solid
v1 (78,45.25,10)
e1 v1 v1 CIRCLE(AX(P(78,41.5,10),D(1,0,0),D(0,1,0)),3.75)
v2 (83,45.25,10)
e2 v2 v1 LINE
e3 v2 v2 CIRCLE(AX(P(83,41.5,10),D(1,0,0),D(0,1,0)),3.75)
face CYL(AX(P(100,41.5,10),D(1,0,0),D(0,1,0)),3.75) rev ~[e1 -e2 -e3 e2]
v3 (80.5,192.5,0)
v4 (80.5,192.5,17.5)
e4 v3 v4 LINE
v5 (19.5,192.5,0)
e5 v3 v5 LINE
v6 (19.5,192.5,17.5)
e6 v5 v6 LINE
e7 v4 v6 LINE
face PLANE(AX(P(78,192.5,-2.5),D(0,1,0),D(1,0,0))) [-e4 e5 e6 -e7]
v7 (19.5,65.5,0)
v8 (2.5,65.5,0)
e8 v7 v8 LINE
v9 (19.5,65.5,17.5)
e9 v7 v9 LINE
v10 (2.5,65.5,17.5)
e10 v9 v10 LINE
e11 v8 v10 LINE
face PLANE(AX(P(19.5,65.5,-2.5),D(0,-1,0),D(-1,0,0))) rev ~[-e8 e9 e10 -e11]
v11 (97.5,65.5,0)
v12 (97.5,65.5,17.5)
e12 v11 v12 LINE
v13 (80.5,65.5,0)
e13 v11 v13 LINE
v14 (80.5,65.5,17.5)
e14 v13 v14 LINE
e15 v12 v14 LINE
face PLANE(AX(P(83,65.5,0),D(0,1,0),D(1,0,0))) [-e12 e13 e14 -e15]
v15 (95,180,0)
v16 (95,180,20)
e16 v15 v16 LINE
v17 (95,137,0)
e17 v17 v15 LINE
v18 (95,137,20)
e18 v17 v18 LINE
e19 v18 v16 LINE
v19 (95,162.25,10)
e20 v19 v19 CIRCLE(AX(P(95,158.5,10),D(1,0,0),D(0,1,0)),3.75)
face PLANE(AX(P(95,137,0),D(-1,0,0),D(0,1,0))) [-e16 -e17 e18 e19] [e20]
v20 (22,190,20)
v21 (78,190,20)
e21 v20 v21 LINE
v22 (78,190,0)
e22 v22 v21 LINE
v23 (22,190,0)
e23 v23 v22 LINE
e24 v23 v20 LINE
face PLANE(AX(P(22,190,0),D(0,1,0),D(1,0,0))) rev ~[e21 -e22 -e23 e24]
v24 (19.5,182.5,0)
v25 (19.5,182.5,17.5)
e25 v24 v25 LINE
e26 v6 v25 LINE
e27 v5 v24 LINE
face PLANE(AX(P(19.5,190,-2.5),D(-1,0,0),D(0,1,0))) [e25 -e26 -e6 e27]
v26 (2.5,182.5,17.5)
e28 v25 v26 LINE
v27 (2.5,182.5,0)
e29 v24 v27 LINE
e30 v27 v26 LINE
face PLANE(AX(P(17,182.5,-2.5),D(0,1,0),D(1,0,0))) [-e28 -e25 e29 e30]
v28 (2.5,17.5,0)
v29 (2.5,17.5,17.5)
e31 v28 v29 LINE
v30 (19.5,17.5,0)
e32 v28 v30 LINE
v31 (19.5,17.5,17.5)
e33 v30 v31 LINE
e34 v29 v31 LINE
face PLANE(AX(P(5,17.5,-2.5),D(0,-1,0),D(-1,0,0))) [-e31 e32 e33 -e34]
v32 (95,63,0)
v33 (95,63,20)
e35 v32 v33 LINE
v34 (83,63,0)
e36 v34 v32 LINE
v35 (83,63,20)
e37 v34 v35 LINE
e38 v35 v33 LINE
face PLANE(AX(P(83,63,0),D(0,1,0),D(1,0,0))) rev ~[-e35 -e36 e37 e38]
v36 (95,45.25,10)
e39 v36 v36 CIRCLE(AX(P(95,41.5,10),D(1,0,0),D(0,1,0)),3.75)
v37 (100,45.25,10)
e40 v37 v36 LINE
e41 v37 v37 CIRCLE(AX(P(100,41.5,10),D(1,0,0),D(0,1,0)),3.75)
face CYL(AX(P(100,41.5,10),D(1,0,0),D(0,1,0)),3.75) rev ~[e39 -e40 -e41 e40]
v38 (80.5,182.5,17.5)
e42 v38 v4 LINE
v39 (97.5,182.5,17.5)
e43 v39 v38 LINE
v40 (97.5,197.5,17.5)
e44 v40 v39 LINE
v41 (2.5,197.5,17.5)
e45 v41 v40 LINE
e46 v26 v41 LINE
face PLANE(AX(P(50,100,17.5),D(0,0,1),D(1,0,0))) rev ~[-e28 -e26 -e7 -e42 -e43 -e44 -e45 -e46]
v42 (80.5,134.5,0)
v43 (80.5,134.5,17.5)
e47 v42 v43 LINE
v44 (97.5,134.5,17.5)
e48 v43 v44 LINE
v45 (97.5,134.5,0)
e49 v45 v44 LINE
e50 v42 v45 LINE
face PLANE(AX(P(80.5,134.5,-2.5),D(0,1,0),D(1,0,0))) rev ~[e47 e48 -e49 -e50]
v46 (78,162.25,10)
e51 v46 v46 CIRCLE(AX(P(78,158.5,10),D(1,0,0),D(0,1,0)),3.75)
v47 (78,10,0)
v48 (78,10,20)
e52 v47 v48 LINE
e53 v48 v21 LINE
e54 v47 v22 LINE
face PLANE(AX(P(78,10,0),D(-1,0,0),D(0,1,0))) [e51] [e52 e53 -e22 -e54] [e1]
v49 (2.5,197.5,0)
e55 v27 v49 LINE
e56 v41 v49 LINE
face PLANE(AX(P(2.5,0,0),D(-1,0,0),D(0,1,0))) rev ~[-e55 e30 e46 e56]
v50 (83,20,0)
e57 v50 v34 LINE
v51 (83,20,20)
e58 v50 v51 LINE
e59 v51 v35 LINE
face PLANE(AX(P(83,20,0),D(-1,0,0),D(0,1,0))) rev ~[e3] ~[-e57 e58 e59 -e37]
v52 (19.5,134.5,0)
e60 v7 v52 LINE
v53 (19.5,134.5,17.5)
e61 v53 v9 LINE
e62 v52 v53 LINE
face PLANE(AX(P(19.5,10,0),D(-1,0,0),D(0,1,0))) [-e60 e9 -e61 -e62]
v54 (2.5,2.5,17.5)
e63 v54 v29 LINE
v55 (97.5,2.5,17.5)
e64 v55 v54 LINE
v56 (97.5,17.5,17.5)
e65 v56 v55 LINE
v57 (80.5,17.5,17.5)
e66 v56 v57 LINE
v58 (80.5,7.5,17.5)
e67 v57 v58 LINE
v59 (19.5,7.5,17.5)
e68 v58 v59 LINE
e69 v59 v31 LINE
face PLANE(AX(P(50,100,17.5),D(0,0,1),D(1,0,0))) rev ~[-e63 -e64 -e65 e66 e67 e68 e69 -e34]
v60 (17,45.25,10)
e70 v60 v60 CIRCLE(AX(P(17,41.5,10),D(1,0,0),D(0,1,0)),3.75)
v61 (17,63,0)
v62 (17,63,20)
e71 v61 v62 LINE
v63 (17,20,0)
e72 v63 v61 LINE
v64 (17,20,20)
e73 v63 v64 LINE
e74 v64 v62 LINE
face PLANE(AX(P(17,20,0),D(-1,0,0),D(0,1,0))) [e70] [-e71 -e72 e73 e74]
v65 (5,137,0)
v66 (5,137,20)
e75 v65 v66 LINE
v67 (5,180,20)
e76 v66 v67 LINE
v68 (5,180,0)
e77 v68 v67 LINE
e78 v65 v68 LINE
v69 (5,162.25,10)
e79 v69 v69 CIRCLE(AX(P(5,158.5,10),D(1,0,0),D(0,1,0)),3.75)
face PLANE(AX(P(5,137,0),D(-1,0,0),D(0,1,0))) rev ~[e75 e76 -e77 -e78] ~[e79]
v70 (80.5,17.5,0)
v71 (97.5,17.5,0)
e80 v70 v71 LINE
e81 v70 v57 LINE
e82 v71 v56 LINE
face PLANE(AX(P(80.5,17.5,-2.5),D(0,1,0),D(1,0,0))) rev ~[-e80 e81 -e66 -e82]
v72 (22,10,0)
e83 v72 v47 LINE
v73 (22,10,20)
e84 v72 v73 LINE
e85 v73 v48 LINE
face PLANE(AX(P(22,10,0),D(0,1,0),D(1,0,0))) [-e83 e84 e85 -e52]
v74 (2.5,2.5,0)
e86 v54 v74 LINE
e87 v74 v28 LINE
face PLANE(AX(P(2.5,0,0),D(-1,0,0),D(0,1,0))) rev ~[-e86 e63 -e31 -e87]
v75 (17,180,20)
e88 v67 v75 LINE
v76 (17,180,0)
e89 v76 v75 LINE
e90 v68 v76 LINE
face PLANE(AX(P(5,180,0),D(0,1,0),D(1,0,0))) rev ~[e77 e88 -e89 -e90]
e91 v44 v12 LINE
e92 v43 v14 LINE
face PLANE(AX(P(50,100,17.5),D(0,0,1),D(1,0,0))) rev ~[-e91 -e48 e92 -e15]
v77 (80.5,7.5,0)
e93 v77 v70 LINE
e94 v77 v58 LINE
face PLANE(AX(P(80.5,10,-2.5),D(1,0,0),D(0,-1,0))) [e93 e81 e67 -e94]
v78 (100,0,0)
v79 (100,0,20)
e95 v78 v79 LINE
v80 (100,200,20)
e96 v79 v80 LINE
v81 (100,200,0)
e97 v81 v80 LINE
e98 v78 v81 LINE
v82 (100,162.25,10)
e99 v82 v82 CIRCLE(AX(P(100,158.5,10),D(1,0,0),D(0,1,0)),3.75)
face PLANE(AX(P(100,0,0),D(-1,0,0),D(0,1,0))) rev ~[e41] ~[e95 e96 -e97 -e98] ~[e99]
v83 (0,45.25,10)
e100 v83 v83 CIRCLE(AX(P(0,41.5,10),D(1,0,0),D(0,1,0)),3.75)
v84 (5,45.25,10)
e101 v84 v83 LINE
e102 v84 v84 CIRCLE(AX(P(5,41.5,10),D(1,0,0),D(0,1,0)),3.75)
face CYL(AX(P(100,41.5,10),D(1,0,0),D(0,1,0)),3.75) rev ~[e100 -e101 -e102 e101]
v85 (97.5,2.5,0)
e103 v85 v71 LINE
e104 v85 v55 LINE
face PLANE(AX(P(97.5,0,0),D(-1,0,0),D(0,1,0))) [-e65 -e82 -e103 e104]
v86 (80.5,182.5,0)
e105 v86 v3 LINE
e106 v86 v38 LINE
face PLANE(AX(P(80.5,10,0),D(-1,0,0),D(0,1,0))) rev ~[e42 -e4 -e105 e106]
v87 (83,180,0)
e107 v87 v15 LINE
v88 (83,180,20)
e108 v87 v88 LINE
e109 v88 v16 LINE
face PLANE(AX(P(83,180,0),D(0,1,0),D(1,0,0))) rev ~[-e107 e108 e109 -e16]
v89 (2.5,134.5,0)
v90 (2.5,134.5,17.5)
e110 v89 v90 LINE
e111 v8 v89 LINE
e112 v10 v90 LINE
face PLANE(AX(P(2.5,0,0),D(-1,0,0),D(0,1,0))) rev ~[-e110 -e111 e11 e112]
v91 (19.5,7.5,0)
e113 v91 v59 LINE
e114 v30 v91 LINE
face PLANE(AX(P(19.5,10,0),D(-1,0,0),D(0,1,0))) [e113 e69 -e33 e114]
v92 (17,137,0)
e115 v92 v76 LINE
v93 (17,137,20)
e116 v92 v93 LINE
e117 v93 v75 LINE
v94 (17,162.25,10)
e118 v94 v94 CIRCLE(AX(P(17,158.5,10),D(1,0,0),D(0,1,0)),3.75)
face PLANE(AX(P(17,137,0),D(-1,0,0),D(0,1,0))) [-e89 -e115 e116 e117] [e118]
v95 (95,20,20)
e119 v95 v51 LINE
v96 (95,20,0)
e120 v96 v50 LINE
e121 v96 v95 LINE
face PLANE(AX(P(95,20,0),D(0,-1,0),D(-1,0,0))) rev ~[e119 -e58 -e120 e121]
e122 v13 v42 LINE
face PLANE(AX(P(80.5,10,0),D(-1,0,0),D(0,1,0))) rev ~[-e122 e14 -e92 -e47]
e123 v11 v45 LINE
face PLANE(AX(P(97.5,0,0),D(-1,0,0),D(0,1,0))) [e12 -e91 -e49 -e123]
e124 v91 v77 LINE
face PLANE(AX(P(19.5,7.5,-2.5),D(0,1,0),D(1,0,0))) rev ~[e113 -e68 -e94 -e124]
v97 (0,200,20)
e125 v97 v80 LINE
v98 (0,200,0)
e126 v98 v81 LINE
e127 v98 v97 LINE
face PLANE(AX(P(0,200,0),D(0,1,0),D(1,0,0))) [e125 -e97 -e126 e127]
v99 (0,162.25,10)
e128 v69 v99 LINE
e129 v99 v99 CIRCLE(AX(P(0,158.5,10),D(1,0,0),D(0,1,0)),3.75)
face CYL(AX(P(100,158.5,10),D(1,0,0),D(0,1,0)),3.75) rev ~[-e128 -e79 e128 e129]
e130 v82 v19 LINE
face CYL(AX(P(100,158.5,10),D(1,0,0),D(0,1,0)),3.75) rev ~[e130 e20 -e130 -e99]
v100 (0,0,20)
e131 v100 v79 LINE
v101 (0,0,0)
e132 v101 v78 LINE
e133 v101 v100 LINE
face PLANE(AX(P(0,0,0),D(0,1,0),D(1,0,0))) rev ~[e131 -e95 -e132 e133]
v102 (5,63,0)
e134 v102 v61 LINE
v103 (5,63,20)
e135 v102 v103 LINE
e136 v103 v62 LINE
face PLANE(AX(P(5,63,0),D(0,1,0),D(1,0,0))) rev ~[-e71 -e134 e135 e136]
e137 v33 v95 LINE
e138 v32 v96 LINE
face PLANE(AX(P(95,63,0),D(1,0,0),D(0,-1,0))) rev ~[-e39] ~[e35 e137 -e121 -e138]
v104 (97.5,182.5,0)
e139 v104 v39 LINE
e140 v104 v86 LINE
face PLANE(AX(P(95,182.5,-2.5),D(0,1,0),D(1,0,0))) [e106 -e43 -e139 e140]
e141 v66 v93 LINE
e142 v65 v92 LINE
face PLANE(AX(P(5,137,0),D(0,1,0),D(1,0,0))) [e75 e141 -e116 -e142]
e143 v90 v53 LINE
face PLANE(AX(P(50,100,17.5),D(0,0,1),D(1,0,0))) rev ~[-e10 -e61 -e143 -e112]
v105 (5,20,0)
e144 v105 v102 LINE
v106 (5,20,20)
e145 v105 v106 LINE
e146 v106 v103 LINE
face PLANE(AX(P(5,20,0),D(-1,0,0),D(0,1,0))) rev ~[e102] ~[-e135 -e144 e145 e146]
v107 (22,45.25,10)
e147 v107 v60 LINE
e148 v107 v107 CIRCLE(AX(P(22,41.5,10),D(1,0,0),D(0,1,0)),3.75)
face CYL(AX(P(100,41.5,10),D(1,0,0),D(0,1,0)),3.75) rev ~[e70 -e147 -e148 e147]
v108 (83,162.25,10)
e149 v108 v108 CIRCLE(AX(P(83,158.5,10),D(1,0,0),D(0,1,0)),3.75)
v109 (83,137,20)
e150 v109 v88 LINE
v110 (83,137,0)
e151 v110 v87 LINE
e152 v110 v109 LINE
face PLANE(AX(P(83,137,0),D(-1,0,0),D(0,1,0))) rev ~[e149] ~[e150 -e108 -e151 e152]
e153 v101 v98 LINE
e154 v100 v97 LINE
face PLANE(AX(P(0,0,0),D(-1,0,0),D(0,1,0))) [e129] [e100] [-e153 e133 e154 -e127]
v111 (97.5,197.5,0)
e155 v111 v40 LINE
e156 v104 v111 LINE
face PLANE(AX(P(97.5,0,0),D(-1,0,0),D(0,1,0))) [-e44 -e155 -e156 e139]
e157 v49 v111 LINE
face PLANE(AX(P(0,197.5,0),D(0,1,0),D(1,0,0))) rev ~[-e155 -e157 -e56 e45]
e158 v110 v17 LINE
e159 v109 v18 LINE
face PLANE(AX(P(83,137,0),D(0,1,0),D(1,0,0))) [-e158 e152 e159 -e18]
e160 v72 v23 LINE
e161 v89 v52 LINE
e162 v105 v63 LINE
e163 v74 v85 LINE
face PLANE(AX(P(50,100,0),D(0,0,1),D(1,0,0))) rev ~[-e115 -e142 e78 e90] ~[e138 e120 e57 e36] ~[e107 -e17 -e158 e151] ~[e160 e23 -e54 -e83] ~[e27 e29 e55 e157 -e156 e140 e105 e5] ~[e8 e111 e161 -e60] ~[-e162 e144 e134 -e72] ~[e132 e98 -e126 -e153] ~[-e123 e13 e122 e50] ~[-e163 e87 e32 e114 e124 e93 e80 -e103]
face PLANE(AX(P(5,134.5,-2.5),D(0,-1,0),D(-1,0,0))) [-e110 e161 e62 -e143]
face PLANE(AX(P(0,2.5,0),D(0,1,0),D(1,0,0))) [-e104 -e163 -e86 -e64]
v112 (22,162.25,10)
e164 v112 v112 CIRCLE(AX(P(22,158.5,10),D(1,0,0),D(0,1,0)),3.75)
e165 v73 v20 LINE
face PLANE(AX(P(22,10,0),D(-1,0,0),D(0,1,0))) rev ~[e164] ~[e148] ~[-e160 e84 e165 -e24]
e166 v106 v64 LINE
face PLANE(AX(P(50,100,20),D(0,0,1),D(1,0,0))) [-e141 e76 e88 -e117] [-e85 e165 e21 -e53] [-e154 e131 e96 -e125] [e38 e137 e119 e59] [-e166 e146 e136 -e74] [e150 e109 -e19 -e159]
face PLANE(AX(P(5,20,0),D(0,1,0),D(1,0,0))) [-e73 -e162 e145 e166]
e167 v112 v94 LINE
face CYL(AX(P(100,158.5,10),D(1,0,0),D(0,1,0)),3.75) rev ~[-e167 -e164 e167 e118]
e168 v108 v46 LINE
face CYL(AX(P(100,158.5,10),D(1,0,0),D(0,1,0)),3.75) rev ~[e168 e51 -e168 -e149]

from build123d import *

# Parameters (mm, degrees)
F0_W        = 100
F0_H        = 200
F0_W_2      = 12
F0_H_2      = 43
F0_W_3      = 56
F0_H_3      = 180
F1_DEPTH    = 20
F2_R        = 3.75
F3_DEPTH    = 100.001
F4_T        = 2.5
F4_T3_DEPTH = 25


# Not quite as in the source:
# - a shell that OpenCascade refuses in one call is made with other operations: the cavity is built on its own and cut out


with BuildPart() as f1:
    # F0 (on Top) → F1 (new body)
    with BuildSketch(Plane.XY):
        with Locations((50, 100)):
            Rectangle(F0_W, F0_H)
        with Locations((11, 41.5)):
            Rectangle(F0_W_2, F0_H_2, mode=Mode.SUBTRACT)
        Polygon((89, 20), (83, 20), (83, 63), (95, 63), (95, 20), align=None, mode=Mode.SUBTRACT)
        with Locations((11, 158.5)):
            Rectangle(F0_W_2, F0_H_2, mode=Mode.SUBTRACT)
        with Locations((50, 100)):
            Rectangle(F0_W_3, F0_H_3, mode=Mode.SUBTRACT)
        with Locations((89, 158.5)):
            Rectangle(F0_W_2, F0_H_2, mode=Mode.SUBTRACT)
    extrude(amount=F1_DEPTH)

    # F2 (on face) → F3 (cut, through all)
    with BuildSketch(Plane.YZ.offset(100)):
        with Locations((41.5, 10)):
            Circle(F2_R)
        with Locations((158.5, 10)):
            Circle(F2_R)
    extrude(amount=-F3_DEPTH, mode=Mode.SUBTRACT)

    # F4: shell of thickness 2.5, made by hand


with BuildPart() as f4_core1:
    # F4_t2: copy of F1
    add(f1.part)

    # the walls: a layer under each face that stays
    f4_faces = [f4_core1.faces().sort_by_distance(p)[0] for p in [
        (0, 100, 10),
        (50, 200, 10),
        (16.6666666667, 100, 20),
        (50, 0, 10),
        (2.5, 154.75, 10),
        (2.5, 37.75, 10),
        (100, 100, 10),
        (17, 55.8333333333, 16.6666666667),
        (11, 20, 10),
        (5, 27.1666666667, 16.6666666667),
        (11, 63, 10),
        (83, 27.1666666667, 16.6666666667),
        (89, 63, 10),
        (95, 55.8333333333, 16.6666666667),
        (89, 20, 10),
        (11, 180, 10),
        (17, 172.8333333333, 16.6666666667),
        (11, 137, 10),
        (5, 144.1666666667, 16.6666666667),
        (22, 100, 10),
        (50, 190, 10),
        (78, 100, 10),
        (50, 10, 10),
        (83, 144.1666666667, 16.6666666667),
        (89, 180, 10),
        (95, 172.8333333333, 16.6666666667),
        (89, 137, 10),
        (97.5, 37.75, 10),
        (97.5, 154.75, 10),
        (19.5, 37.75, 10),
        (80.5, 37.75, 10),
        (19.5, 154.75, 10),
        (80.5, 154.75, 10),
    ]]
    thicken(f4_faces, amount=-F4_T, mode=Mode.SUBTRACT)

    # F4_s4 → F4_t3 (cut)
    with BuildSketch(Plane.XY.offset(-2.5)):
        Polygon((16.975, 62.975), (19.5, 63), (19.5, 65.5), (17, 65.5), align=None)
        Polygon((16.975, 20.025), (19.5, 20), (19.5, 17.5), (17, 17.5), align=None)
        Polygon((5.025, 20.025), (5, 17.5), (2.5, 17.5), (2.5, 20), align=None)
        Polygon((5.025, 62.975), (2.5, 63), (2.5, 65.5), (5, 65.5), align=None)
        Polygon((83.025, 20.025), (80.5, 20), (80.5, 17.5), (83, 17.5), align=None)
        Polygon((83.025, 62.975), (80.5, 63), (80.5, 65.5), (83, 65.5), align=None)
        Polygon((94.975, 62.975), (95, 65.5), (97.5, 65.5), (97.5, 63), align=None)
        Polygon((94.975, 20.025), (97.5, 20), (97.5, 17.5), (95, 17.5), align=None)
        Polygon((5.025, 179.975), (5, 182.5), (2.5, 182.5), (2.5, 180), align=None)
        Polygon((16.975, 179.975), (17, 182.5), (19.5, 182.5), (19.5, 180), align=None)
        Polygon((16.975, 137.025), (19.5, 137), (19.5, 134.5), (17, 134.5), align=None)
        Polygon((5.025, 137.025), (5, 134.5), (2.5, 134.5), (2.5, 137), align=None)
        Polygon((22.025, 10.025), (19.5, 10), (19.5, 7.5), (22, 7.5), align=None)
        Polygon((22.025, 189.975), (19.5, 190), (19.5, 192.5), (22, 192.5), align=None)
        Polygon((77.975, 189.975), (78, 192.5), (80.5, 192.5), (80.5, 190), align=None)
        Polygon((77.975, 10.025), (80.5, 10), (80.5, 7.5), (78, 7.5), align=None)
        Polygon((83.025, 137.025), (80.5, 137), (80.5, 134.5), (83, 134.5), align=None)
        Polygon((83.025, 179.975), (80.5, 180), (80.5, 182.5), (83, 182.5), align=None)
        Polygon((94.975, 179.975), (95, 182.5), (97.5, 182.5), (97.5, 180), align=None)
        Polygon((94.975, 137.025), (97.5, 137), (97.5, 134.5), (95, 134.5), align=None)
    extrude(amount=F4_T3_DEPTH, mode=Mode.SUBTRACT)


with BuildPart() as f1_1:
    add(f1.part)

    # what is left inside the walls is the cavity
    f4_cavity = [f4_core1.part.solids().sort_by_distance(p)[0] for p in [
        (50, 197.475, 11.666667),
        (2.525, 100, 11.666667),
        (50, 2.525, 11.666667),
        (80.525, 100, 11.666667),
    ]]
    add(f4_cavity, mode=Mode.SUBTRACT)


solid = f1_1.part
